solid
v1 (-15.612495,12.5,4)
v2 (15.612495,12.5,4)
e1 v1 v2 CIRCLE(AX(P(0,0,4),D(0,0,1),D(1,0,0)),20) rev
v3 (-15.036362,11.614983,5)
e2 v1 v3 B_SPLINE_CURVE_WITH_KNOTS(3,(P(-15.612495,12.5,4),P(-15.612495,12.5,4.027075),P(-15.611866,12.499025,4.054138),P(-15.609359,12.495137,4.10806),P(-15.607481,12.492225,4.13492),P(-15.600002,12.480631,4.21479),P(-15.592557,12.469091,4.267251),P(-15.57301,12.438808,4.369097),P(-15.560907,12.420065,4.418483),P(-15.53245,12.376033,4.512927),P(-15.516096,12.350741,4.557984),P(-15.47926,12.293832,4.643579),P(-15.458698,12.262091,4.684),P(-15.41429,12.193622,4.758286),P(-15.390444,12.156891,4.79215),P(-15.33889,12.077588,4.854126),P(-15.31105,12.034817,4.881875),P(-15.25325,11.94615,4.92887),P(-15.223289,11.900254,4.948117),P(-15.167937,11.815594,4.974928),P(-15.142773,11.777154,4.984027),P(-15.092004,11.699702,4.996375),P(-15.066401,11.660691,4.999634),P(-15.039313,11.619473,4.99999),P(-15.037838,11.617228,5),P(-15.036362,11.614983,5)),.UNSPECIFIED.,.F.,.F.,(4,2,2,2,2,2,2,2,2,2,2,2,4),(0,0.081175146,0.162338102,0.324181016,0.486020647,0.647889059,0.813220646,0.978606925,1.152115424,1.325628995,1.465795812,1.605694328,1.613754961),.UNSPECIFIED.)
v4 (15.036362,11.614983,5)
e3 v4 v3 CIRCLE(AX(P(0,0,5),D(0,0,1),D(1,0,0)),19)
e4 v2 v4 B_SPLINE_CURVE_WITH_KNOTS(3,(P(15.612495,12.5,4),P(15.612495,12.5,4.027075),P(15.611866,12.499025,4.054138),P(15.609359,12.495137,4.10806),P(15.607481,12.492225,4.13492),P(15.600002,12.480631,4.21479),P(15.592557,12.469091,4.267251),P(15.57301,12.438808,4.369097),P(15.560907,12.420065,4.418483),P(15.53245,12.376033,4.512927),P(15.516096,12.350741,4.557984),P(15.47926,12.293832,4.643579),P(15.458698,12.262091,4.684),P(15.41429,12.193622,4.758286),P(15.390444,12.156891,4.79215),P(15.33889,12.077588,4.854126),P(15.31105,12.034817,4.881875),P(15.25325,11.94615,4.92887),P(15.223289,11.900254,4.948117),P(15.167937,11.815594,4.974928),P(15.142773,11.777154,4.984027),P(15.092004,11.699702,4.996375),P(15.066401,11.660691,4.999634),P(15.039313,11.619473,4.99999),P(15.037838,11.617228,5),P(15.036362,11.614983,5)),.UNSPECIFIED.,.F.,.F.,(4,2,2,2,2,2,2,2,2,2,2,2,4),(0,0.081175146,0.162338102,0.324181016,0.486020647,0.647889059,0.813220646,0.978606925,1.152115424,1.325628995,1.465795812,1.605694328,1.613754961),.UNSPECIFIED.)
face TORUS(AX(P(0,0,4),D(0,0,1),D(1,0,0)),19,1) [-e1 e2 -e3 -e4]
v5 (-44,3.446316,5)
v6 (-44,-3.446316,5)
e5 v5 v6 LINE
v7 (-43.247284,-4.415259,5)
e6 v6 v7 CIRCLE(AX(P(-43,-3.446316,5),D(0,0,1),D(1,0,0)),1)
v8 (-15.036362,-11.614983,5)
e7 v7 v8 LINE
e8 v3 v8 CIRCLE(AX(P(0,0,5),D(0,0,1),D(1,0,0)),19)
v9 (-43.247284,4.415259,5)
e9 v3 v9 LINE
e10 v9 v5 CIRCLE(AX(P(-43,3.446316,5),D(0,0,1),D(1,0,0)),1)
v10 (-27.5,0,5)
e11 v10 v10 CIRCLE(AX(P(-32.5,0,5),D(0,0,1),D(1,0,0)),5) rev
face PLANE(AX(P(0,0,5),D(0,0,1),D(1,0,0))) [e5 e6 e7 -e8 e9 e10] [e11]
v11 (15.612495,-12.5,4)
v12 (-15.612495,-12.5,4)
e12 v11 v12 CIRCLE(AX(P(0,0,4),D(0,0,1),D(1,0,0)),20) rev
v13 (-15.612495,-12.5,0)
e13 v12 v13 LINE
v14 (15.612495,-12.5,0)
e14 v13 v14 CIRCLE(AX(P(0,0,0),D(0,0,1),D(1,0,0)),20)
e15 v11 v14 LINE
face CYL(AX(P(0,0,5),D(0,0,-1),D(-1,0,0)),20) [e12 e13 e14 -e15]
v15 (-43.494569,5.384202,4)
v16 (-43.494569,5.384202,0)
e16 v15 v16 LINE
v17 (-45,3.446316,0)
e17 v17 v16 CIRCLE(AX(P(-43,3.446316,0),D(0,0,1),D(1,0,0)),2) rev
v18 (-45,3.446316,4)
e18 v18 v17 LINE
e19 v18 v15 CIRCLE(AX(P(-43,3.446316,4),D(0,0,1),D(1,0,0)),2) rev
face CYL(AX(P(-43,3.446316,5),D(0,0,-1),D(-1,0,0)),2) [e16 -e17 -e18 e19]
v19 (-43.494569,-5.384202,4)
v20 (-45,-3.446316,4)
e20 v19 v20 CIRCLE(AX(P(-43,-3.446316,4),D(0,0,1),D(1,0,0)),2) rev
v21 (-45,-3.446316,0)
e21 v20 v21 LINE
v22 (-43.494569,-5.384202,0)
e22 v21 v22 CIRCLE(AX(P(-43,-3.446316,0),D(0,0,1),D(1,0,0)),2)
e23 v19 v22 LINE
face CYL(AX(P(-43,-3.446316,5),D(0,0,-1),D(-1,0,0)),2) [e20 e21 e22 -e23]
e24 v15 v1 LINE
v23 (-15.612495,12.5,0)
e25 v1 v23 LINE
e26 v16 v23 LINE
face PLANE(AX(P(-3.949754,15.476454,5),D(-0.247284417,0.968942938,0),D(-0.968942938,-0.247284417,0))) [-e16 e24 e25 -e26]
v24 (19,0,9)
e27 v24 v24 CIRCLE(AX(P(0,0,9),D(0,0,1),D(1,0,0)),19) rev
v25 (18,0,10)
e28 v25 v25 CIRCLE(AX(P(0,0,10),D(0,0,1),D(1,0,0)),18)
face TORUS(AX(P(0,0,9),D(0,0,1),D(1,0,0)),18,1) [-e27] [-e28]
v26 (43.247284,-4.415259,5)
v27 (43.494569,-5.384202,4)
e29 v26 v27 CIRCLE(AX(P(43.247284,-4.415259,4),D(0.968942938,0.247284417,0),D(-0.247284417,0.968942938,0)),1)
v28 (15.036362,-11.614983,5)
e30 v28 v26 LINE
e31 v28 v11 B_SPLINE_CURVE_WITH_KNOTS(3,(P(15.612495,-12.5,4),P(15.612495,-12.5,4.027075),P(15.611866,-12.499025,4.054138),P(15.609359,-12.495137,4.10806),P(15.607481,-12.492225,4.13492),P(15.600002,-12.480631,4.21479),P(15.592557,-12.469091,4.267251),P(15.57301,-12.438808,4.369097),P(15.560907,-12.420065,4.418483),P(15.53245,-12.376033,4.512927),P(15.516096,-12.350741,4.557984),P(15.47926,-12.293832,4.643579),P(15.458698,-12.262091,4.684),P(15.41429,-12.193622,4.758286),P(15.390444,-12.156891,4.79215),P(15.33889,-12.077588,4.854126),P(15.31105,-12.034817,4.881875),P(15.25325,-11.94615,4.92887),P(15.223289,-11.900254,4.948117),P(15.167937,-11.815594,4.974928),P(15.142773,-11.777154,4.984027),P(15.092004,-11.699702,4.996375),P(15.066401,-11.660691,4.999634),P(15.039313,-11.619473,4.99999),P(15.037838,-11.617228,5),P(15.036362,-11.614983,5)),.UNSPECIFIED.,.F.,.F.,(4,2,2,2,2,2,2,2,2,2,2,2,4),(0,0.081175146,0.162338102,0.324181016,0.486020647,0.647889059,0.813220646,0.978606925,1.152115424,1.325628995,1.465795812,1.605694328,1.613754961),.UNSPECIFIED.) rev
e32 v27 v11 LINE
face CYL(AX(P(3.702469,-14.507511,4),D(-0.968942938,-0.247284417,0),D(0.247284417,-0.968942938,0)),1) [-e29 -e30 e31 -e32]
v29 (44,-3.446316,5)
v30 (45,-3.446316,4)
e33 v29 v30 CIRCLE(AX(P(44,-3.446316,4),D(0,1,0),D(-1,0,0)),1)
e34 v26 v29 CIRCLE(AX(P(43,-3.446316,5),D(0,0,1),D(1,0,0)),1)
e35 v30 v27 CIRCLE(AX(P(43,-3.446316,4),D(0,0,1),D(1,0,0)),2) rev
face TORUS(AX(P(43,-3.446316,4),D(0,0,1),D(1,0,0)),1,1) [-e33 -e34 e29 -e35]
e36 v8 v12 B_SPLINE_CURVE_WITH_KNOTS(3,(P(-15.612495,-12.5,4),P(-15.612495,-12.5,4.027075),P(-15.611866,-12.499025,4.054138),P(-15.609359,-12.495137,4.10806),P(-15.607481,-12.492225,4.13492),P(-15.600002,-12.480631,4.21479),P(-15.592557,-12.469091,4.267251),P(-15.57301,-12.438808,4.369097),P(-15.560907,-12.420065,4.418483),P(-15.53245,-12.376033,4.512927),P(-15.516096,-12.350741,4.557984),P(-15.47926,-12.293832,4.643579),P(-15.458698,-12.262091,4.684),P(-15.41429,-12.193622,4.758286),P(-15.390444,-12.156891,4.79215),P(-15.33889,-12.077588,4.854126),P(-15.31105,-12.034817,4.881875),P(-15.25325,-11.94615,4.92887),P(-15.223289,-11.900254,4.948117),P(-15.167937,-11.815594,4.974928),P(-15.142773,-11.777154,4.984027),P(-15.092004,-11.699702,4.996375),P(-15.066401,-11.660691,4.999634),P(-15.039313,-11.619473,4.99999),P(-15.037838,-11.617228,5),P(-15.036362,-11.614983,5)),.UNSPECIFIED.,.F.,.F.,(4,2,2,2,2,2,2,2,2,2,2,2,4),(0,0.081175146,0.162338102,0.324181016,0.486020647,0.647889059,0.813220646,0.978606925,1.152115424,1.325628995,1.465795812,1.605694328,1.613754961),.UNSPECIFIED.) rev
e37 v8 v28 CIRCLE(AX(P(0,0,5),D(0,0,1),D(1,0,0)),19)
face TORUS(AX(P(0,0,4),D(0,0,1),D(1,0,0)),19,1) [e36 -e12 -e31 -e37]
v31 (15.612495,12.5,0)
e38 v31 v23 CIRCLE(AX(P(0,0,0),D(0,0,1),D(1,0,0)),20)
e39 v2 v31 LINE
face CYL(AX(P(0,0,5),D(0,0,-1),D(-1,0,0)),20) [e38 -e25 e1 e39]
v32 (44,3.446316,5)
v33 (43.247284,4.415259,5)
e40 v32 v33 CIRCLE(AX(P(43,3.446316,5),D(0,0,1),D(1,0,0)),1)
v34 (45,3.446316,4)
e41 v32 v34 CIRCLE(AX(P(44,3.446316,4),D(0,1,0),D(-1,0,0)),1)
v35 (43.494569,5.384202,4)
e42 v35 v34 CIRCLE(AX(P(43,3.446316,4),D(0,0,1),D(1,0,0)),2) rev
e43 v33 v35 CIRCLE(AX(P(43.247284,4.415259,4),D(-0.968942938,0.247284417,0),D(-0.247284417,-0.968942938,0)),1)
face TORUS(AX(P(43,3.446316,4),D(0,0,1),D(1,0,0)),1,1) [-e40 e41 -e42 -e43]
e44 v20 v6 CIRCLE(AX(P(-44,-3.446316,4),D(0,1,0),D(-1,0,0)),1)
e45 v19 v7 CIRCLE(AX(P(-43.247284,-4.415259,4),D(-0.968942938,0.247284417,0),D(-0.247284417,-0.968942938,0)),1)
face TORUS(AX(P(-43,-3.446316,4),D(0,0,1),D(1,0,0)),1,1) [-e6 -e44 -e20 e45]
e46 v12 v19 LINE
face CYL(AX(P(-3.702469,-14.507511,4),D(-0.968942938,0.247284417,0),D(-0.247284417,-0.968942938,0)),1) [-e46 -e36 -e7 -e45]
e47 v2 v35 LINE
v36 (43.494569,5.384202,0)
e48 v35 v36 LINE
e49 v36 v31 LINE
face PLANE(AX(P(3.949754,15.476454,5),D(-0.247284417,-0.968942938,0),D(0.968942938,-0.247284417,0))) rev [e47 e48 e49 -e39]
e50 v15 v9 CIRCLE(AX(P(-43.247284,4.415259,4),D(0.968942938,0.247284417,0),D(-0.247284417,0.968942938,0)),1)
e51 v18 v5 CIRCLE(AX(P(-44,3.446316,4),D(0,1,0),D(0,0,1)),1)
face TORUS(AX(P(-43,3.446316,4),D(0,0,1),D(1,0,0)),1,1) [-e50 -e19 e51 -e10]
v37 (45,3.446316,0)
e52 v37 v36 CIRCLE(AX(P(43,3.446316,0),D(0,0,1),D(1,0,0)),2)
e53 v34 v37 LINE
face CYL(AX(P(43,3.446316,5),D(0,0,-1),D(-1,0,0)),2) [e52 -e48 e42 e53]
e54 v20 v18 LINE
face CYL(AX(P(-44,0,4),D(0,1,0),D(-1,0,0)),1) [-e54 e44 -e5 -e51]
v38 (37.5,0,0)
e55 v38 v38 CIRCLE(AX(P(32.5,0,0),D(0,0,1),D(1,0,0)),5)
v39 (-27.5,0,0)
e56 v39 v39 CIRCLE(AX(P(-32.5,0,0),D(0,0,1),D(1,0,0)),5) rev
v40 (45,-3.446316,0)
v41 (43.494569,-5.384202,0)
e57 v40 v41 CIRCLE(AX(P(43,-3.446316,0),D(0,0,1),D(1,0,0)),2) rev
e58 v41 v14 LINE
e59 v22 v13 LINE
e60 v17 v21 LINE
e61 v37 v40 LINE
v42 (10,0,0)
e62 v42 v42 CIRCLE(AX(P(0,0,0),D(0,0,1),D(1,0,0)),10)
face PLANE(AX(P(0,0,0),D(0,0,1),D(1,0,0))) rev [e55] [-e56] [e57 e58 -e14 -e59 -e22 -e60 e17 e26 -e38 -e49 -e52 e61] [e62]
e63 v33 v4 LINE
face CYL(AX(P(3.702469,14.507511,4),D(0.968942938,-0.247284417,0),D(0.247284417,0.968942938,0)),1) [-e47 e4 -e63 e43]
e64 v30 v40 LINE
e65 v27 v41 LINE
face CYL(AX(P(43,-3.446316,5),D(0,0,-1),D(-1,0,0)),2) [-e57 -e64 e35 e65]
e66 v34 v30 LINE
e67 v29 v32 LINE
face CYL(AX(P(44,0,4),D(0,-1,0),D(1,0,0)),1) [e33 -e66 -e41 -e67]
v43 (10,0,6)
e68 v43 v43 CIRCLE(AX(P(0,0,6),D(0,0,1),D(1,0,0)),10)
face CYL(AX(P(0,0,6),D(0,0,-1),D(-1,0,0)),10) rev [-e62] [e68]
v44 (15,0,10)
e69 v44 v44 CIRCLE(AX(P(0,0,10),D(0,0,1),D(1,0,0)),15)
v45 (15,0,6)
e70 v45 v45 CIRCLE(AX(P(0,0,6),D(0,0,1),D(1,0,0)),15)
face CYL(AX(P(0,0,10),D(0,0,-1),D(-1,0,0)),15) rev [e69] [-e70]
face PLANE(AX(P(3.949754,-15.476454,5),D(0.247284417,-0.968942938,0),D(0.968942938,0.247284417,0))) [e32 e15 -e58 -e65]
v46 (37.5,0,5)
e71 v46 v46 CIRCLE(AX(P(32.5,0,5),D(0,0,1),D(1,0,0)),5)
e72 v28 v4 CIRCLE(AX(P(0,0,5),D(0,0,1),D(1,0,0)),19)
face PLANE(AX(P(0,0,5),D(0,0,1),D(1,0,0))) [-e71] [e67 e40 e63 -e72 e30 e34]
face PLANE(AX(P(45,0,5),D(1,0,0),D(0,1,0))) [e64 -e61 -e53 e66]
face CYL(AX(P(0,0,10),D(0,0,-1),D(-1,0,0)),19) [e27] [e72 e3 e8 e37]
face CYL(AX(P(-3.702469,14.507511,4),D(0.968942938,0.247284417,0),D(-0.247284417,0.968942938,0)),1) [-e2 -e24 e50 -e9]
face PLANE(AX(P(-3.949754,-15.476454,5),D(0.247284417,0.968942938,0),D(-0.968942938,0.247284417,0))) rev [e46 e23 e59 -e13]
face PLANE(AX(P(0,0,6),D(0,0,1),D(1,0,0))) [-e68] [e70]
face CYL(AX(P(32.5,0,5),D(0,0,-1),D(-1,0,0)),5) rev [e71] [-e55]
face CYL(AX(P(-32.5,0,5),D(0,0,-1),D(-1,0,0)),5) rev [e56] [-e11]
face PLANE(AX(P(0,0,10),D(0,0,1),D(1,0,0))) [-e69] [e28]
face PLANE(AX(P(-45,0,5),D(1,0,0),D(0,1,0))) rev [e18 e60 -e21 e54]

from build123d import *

# Parameters (mm, degrees)
SKETCH2_R           = 5
SKETCH2_R_2         = 20
SKETCH2_R_3         = 19
BOSS_EXTRUDE1_DEPTH = 5
SKETCH2_3_R         = 19
SKETCH2_3_R_2       = 15
BOSS_EXTRUDE2_DEPTH = 10
SKETCH2_4_R         = 15
SKETCH2_4_R_2       = 10
BOSS_EXTRUDE3_DEPTH = 6
FILLET1_R           = 1
FILLET2_R           = 1


with BuildPart() as part:
    # Sketch2 → Boss-Extrude1 (new body)
    # profile 1 of 3: a face of its own
    with BuildSketch(Plane.XY):
        with BuildLine():
            ThreePointArc((-15.612494996, -12.5), (-20, 0), (-15.612494996, 12.5))
            Line((-15.612494996, 12.5), (-43.494568834, 5.384201849))
            ThreePointArc((-43.494568834, 5.384201849), (-44.579420411, 4.673276105), (-45, 3.446315972))
            Line((-45, 3.446315972), (-45, -3.446315972))
            ThreePointArc((-45, -3.446315972), (-44.579420411, -4.673276105), (-43.494568834, -5.384201849))
            Line((-43.494568834, -5.384201849), (-15.612494996, -12.5))
        make_face()
        with Locations((-32.5, 0)):
            Circle(SKETCH2_R, mode=Mode.SUBTRACT)
    # profile 2 of 3: a face of its own
    with BuildSketch(Plane.XY):
        Circle(SKETCH2_R_2)
        Circle(SKETCH2_R_3, mode=Mode.SUBTRACT)
    # profile 3 of 3: a face of its own
    with BuildSketch(Plane.XY):
        with BuildLine():
            Line((45, -3.446315972), (45, 3.446315972))
            ThreePointArc((45, 3.446315972), (44.579420411, 4.673276105), (43.494568834, 5.384201849))
            Line((43.494568834, 5.384201849), (15.612494996, 12.5))
            ThreePointArc((15.612494996, 12.5), (18.871273141, 6.623824427), (20, 0))
            ThreePointArc((20, 0), (18.871273141, -6.623824427), (15.612494996, -12.5))
            Line((15.612494996, -12.5), (43.494568834, -5.384201849))
            ThreePointArc((43.494568834, -5.384201849), (44.579420411, -4.673276105), (45, -3.446315972))
        make_face()
        with Locations((32.5, 0)):
            Circle(SKETCH2_R, mode=Mode.SUBTRACT)
    extrude(amount=BOSS_EXTRUDE1_DEPTH)

    # Sketch2<3> → Boss-Extrude2 (add)
    with BuildSketch(Plane.XY):
        Circle(SKETCH2_3_R)
        Circle(SKETCH2_3_R_2, mode=Mode.SUBTRACT)
    extrude(amount=BOSS_EXTRUDE2_DEPTH)

    # Sketch2<4> → Boss-Extrude3 (add)
    with BuildSketch(Plane.XY):
        Circle(SKETCH2_4_R)
        Circle(SKETCH2_4_R_2, mode=Mode.SUBTRACT)
    extrude(amount=BOSS_EXTRUDE3_DEPTH)

    # Fillet1
    fillet1_edges = [part.edges().sort_by_distance(p)[0] for p in [
        (-19, 0, 10),
    ]]
    fillet(fillet1_edges, radius=FILLET1_R)

    # Fillet2
    fillet2_edges = [part.edges().sort_by_distance(p)[0] for p in [
        (-44.579420411, -4.673276105, 5),
        (29.553531915, 8.942100924, 5),
        (0, 20, 5),
        (-29.553531915, 8.942100924, 5),
        (-44.579420411, 4.673276105, 5),
        (-29.553531915, -8.942100924, 5),
        (0, -20, 5),
        (29.553531915, -8.942100924, 5),
        (-45, 0, 5),
        (44.579420411, -4.673276105, 5),
        (45, 0, 5),
        (44.579420411, 4.673276105, 5),
    ]]
    fillet(fillet2_edges, radius=FILLET2_R - 0.0001)  # a hair under: the kernel refuses the full size


solid = part.part
